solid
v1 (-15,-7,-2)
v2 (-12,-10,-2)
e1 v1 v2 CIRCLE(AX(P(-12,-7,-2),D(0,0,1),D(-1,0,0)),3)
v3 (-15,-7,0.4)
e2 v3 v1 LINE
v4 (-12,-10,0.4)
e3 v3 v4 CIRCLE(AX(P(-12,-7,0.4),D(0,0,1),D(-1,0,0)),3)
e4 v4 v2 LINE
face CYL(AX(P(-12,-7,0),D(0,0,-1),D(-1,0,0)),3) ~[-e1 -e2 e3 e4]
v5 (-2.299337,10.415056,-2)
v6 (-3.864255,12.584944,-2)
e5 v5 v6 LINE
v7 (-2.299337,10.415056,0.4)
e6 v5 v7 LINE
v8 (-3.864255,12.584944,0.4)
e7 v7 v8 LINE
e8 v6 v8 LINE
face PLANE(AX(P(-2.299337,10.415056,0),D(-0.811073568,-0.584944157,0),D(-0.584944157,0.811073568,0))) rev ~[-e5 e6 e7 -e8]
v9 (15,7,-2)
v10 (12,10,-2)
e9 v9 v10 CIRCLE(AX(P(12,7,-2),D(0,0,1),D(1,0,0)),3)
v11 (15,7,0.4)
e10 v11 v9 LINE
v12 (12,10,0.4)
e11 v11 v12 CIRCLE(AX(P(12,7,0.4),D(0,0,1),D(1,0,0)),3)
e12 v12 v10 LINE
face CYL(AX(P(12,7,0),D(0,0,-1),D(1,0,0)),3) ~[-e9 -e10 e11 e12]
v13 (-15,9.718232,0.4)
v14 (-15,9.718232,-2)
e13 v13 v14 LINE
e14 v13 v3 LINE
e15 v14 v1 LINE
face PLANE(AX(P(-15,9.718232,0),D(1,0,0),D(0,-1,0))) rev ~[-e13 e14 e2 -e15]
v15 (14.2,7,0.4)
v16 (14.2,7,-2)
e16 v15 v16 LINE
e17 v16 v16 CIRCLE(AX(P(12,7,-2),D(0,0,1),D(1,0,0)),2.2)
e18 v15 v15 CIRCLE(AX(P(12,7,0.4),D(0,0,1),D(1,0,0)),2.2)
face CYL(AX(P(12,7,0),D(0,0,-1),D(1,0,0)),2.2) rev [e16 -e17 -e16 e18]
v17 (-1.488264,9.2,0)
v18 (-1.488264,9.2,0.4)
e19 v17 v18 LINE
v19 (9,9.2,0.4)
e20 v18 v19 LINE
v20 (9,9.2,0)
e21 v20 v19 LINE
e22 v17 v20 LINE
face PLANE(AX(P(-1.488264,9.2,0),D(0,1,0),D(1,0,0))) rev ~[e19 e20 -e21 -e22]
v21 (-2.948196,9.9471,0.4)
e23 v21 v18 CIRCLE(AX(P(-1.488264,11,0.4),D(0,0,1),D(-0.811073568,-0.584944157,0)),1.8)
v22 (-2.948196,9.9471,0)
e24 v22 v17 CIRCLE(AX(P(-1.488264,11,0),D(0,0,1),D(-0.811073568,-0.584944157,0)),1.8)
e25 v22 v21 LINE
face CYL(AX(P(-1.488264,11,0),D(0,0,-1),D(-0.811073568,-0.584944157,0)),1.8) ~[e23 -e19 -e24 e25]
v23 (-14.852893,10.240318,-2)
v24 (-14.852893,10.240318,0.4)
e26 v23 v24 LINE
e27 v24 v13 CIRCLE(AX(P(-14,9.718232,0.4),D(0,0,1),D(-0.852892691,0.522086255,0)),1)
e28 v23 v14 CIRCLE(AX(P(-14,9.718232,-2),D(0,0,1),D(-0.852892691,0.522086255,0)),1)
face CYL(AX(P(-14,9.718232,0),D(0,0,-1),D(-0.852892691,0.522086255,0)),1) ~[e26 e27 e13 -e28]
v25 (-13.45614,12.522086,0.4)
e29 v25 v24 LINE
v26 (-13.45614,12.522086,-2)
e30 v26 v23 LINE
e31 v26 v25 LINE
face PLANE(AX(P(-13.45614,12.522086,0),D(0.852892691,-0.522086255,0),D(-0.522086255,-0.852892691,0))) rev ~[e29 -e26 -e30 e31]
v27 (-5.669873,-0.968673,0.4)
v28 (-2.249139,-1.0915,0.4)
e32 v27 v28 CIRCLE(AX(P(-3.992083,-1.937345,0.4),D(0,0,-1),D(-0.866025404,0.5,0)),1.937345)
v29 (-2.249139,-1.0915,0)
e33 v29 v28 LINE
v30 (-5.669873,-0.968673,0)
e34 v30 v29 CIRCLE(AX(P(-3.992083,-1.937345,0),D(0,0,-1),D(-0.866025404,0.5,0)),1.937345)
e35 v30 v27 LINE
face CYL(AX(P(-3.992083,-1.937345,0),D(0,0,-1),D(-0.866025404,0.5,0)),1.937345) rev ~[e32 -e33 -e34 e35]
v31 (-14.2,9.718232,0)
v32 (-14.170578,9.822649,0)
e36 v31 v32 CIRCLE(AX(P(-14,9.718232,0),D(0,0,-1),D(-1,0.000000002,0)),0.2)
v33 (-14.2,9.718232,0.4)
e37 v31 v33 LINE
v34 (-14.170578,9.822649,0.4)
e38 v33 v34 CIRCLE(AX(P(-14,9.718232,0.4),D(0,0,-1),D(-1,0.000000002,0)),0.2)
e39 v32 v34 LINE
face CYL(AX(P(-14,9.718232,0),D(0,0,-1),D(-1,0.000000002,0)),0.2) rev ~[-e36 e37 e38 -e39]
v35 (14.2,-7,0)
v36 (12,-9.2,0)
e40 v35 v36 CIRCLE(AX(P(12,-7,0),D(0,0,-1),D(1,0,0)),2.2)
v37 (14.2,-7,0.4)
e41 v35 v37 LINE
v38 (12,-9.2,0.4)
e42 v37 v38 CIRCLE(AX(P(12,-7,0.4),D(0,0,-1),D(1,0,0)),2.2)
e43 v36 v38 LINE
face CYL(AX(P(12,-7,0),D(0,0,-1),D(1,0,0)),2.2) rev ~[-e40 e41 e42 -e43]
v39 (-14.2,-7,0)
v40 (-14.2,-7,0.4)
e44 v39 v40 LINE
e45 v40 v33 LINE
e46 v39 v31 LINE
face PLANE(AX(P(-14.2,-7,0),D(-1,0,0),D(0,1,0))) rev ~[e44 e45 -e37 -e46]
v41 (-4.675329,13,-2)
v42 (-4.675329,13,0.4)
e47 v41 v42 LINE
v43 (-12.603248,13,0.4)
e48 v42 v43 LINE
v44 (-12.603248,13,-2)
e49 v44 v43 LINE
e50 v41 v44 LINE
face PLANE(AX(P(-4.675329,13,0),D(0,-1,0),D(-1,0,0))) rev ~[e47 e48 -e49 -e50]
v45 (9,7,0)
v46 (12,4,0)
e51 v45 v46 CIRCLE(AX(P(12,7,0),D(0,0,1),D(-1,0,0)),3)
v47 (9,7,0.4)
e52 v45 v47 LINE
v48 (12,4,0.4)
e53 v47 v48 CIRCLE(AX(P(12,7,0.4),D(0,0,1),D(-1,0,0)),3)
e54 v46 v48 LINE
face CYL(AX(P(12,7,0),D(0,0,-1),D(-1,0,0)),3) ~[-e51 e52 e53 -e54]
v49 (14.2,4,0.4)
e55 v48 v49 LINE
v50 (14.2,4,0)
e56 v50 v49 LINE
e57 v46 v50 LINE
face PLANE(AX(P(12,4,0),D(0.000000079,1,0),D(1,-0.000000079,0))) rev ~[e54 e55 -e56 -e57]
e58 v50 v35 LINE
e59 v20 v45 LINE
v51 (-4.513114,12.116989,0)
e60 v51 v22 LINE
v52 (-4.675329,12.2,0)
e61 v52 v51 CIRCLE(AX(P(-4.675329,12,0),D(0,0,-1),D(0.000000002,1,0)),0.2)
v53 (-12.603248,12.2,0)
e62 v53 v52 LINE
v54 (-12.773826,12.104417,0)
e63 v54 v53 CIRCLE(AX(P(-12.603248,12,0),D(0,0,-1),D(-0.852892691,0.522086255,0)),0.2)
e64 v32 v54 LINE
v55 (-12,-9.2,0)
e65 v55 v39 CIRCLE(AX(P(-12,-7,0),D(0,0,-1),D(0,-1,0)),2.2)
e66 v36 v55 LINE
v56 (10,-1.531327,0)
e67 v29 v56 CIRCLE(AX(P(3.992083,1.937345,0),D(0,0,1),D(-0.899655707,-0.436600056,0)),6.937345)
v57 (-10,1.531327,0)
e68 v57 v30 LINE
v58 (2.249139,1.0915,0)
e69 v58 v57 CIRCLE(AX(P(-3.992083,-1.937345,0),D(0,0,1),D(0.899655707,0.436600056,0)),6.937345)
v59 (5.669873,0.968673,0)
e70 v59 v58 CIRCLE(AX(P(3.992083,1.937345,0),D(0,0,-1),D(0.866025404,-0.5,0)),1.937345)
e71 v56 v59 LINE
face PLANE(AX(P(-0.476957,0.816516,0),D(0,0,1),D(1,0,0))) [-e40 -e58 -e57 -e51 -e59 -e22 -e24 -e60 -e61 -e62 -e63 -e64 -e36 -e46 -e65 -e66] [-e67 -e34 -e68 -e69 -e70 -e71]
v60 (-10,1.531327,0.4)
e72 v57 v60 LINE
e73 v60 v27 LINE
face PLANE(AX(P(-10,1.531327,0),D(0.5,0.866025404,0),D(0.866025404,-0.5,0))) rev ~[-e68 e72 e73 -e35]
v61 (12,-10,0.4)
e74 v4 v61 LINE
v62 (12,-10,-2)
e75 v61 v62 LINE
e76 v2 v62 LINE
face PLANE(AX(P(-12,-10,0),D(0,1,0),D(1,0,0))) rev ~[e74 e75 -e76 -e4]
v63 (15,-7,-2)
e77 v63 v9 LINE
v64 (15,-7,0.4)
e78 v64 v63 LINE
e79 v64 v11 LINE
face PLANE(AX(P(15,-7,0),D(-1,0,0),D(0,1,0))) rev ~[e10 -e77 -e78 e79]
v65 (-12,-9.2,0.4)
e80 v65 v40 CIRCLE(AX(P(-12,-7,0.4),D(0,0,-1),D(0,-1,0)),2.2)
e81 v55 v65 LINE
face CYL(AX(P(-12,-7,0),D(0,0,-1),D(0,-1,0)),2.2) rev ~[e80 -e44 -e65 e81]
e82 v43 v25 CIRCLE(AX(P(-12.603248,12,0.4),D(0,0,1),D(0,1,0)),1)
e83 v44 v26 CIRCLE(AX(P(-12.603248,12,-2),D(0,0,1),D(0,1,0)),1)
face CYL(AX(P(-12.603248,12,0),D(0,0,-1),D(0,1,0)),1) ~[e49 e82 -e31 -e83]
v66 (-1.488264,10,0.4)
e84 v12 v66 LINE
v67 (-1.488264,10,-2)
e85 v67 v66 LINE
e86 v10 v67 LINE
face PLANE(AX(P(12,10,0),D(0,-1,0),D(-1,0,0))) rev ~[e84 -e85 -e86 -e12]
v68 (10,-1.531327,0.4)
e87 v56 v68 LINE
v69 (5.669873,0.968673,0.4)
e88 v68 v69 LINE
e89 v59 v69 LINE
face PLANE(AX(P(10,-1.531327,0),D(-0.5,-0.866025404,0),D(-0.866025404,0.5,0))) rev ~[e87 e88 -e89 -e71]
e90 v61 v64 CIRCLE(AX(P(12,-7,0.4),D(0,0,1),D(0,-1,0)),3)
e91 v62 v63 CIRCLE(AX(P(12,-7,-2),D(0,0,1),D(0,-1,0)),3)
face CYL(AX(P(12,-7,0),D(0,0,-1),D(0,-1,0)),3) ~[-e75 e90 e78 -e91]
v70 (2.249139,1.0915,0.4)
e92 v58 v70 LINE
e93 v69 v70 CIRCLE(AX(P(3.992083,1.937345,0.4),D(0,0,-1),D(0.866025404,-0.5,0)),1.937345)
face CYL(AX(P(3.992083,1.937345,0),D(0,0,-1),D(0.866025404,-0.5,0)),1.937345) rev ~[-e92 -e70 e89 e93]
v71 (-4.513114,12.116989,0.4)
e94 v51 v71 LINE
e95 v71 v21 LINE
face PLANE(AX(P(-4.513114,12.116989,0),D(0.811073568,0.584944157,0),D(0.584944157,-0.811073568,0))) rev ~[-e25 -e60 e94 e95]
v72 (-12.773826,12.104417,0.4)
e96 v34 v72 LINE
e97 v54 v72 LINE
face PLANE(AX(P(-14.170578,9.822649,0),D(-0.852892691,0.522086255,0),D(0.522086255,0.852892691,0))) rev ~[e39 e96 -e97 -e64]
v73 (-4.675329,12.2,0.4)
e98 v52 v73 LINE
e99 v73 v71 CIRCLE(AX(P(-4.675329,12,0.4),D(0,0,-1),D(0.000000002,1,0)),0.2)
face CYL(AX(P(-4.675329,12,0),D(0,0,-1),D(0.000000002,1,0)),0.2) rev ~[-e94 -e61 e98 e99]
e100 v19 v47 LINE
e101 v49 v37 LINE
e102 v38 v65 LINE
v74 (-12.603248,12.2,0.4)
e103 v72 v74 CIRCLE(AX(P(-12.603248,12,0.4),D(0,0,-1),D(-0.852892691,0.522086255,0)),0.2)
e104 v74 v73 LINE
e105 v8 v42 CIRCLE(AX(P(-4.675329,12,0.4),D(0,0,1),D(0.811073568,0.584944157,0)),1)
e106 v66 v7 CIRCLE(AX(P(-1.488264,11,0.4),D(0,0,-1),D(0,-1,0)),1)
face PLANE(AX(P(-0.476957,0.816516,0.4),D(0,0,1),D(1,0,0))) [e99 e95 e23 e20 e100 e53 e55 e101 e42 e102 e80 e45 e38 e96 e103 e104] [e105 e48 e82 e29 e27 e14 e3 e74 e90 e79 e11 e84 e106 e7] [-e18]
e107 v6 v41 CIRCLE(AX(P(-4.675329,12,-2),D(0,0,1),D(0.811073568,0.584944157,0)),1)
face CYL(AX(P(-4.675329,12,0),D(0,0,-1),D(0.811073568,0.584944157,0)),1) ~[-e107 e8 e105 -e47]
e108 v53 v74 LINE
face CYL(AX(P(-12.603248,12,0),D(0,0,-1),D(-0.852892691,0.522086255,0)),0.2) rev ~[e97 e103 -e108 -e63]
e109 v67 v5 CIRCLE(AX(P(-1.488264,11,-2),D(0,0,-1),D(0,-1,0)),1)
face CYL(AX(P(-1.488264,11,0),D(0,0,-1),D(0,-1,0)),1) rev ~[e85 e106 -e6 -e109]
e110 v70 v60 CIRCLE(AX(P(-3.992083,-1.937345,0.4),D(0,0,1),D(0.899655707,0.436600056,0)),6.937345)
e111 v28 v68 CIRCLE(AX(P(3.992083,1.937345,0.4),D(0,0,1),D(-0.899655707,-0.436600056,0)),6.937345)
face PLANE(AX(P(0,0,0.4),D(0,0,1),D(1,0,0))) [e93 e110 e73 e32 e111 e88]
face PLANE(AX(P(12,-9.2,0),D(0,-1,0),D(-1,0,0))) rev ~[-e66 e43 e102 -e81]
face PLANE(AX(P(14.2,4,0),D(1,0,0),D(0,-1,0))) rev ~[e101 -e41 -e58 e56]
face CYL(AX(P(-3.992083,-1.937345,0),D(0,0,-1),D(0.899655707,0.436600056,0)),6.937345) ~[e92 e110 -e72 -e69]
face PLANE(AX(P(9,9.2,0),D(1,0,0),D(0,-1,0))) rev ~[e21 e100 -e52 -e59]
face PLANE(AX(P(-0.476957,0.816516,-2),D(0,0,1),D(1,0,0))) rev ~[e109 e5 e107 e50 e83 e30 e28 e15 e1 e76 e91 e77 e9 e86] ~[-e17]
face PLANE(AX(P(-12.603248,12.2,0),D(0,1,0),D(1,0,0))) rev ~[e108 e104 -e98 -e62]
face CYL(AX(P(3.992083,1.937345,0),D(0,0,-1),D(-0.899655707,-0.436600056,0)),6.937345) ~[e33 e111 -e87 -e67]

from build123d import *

# Parameters (mm, degrees)
F0_R     = 2.1999998258
F1_DEPTH = 2
F2_DEPTH = 0.4


# Not quite as in the source:
# - ends of sketch curves that miss each other by under 0.0002 mm in the source are joined


with BuildPart() as f1:
    # F0 (on Top) → F1 (new body)
    with BuildSketch(Plane.XY):
        with BuildLine():
            Line((12, 10), (-1.4882636307, 10))
            ThreePointArc((-1.4882636307, 10), (-1.9438159565, 10.1097909917), (-2.2993371991, 10.4150558431))
            Line((-2.2993371991, 10.4150558431), (-3.8642550313, 12.5849441569))
            ThreePointArc((-3.8642550313, 12.5849441569), (-4.2197762739, 12.8902090083), (-4.6753285997, 13))
            Line((-4.6753285997, 13), (-12.6032477109, 13))
            ThreePointArc((-12.6032477109, 13), (-13.0920798627, 12.8723778582), (-13.456140402, 12.5220862548))
            Line((-13.456140402, 12.5220862548), (-14.8528926911, 10.2403180459))
            ThreePointArc((-14.8528926911, 10.2403180459), (-14.9625208286, 9.989439561), (-15, 9.7182317911))
            Line((-15, 9.7182317911), (-15, -7))
            ThreePointArc((-15, -7), (-14.1213203436, -9.1213203436), (-12, -10))
            Line((-12, -10), (12, -10))
            ThreePointArc((12, -10), (14.1213203436, -9.1213203436), (15, -7))
            Line((15, -7), (15, 7))
            ThreePointArc((15, 7), (14.1213203436, 9.1213203436), (12, 10))
        make_face()
        with BuildLine():
            ThreePointArc((-14.1999998258, 9.7182317911), (-14.192503998, 9.7724732978), (-14.1705783896, 9.8226489511))
            Line((-14.1705783896, 9.8226489511), (-12.7738261005, 12.10441716))
            ThreePointArc((-12.7738261005, 12.10441716), (-12.7010140561, 12.1744754196), (-12.6032477109, 12.1999998258))
            Line((-12.6032477109, 12.1999998258), (-4.6753285997, 12.1999998258))
            ThreePointArc((-4.6753285997, 12.1999998258), (-4.5842182139, 12.1780416465), (-4.5131140273, 12.1169887295))
            Line((-4.5131140273, 12.1169887295), (-2.9481961951, 9.9471004156))
            ThreePointArc((-2.9481961951, 9.9471004156), (-2.3082578965, 9.3976236299), (-1.4882636307, 9.1999998258))
            Line((-1.4882636307, 9.1999998258), (9.0000001742, 9.1999998258))
            Line((9.0000001742, 9.1999998258), (9.0000001742, 7))
            ThreePointArc((9.0000001742, 7), (9.8786797797, 4.8786797797), (12, 4.0000001742))
            Line((12, 4.0000001742), (14.1999998258, 4))
            Line((14.1999998258, 4), (14.1999998258, -7))
            ThreePointArc((14.1999998258, -7), (13.5556347954, -8.5556347954), (12, -9.1999998258))
            Line((12, -9.1999998258), (-12, -9.1999998258))
            ThreePointArc((-12, -9.1999998258), (-13.5556347954, -8.5556347954), (-14.1999998258, -7))
            Line((-14.1999998258, -7), (-14.1999998258, 9.7182317911))
        make_face(mode=Mode.SUBTRACT)
        with Locations((12, 7)):
            Circle(F0_R, mode=Mode.SUBTRACT)
        with BuildLine():
            Line((-12.7738261005, 12.10441716), (-14.1705783896, 9.8226489511))
            ThreePointArc((-14.1705783896, 9.8226489511), (-14.192503998, 9.7724732978), (-14.1999998258, 9.7182317911))
            Line((-14.1999998258, 9.7182317911), (-14.1999998258, -7))
            ThreePointArc((-14.1999998258, -7), (-13.5556347954, -8.5556347954), (-12, -9.1999998258))
            Line((-12, -9.1999998258), (12, -9.1999998258))
            ThreePointArc((12, -9.1999998258), (13.5556347954, -8.5556347954), (14.1999998258, -7))
            Line((14.1999998258, -7), (14.1999998258, 4))
            Line((14.1999998258, 4), (12, 4))
            ThreePointArc((12, 4), (9.8786797797, 4.8786797797), (9.0000001742, 7))
            Line((9.0000001742, 7), (9.0000001742, 9.1999998258))
            Line((9.0000001742, 9.1999998258), (-1.4882636307, 9.1999998258))
            ThreePointArc((-1.4882636307, 9.1999998258), (-2.3082578965, 9.3976236299), (-2.9481961951, 9.9471004156))
            Line((-2.9481961951, 9.9471004156), (-4.5131140273, 12.1169887295))
            ThreePointArc((-4.5131140273, 12.1169887295), (-4.5842182139, 12.1780416465), (-4.6753285997, 12.1999998258))
            Line((-4.6753285997, 12.1999998258), (-12.6032477109, 12.1999998258))
            ThreePointArc((-12.6032477109, 12.1999998258), (-12.7010140561, 12.1744754196), (-12.7738261005, 12.10441716))
        make_face()
        with BuildLine():
            ThreePointArc((10, -1.5313274312), (3.7431454959, -4.9955321683), (-2.2491392669, -1.0915001412))
            ThreePointArc((-2.2491392669, -1.0915001412), (-3.9225638289, -0.0012477009), (-5.6698729811, -0.9686725688))
            Line((-5.6698729811, -0.9686725688), (-10, 1.5313274312))
            ThreePointArc((-10, 1.5313274312), (-3.7431454959, 4.9955321683), (2.2491392669, 1.0915001412))
            ThreePointArc((2.2491392669, 1.0915001412), (3.9225638289, 0.0012477009), (5.6698729811, 0.9686725688))
            Line((5.6698729811, 0.9686725688), (10, -1.5313274312))
        make_face(mode=Mode.SUBTRACT)
        with BuildLine():
            ThreePointArc((-5.6698729811, -0.9686725688), (-3.9225638289, -0.0012477009), (-2.2491392669, -1.0915001412))
            ThreePointArc((-2.2491392669, -1.0915001412), (3.7431454959, -4.9955321683), (10, -1.5313274312))
            Line((10, -1.5313274312), (5.6698729811, 0.9686725688))
            ThreePointArc((5.6698729811, 0.9686725688), (3.9225638289, 0.0012477009), (2.2491392669, 1.0915001412))
            ThreePointArc((2.2491392669, 1.0915001412), (-3.7431454959, 4.9955321683), (-10, 1.5313274312))
            Line((-10, 1.5313274312), (-5.6698729811, -0.9686725688))
        make_face()
    extrude(amount=-F1_DEPTH)

    # F0 (on Top) → F2 (join)
    with BuildSketch(Plane.XY):
        with BuildLine():
            Line((12, 10), (-1.4882636307, 10))
            ThreePointArc((-1.4882636307, 10), (-1.9438159565, 10.1097909917), (-2.2993371991, 10.4150558431))
            Line((-2.2993371991, 10.4150558431), (-3.8642550313, 12.5849441569))
            ThreePointArc((-3.8642550313, 12.5849441569), (-4.2197762739, 12.8902090083), (-4.6753285997, 13))
            Line((-4.6753285997, 13), (-12.6032477109, 13))
            ThreePointArc((-12.6032477109, 13), (-13.0920798627, 12.8723778582), (-13.456140402, 12.5220862548))
            Line((-13.456140402, 12.5220862548), (-14.8528926911, 10.2403180459))
            ThreePointArc((-14.8528926911, 10.2403180459), (-14.9625208286, 9.989439561), (-15, 9.7182317911))
            Line((-15, 9.7182317911), (-15, -7))
            ThreePointArc((-15, -7), (-14.1213203436, -9.1213203436), (-12, -10))
            Line((-12, -10), (12, -10))
            ThreePointArc((12, -10), (14.1213203436, -9.1213203436), (15, -7))
            Line((15, -7), (15, 7))
            ThreePointArc((15, 7), (14.1213203436, 9.1213203436), (12, 10))
        make_face()
        with BuildLine():
            ThreePointArc((-14.1999998258, 9.7182317911), (-14.192503998, 9.7724732978), (-14.1705783896, 9.8226489511))
            Line((-14.1705783896, 9.8226489511), (-12.7738261005, 12.10441716))
            ThreePointArc((-12.7738261005, 12.10441716), (-12.7010140561, 12.1744754196), (-12.6032477109, 12.1999998258))
            Line((-12.6032477109, 12.1999998258), (-4.6753285997, 12.1999998258))
            ThreePointArc((-4.6753285997, 12.1999998258), (-4.5842182139, 12.1780416465), (-4.5131140273, 12.1169887295))
            Line((-4.5131140273, 12.1169887295), (-2.9481961951, 9.9471004156))
            ThreePointArc((-2.9481961951, 9.9471004156), (-2.3082578965, 9.3976236299), (-1.4882636307, 9.1999998258))
            Line((-1.4882636307, 9.1999998258), (9.0000001742, 9.1999998258))
            Line((9.0000001742, 9.1999998258), (9.0000001742, 7))
            ThreePointArc((9.0000001742, 7), (9.8786797797, 4.8786797797), (12, 4.0000001742))
            Line((12, 4.0000001742), (14.1999998258, 4))
            Line((14.1999998258, 4), (14.1999998258, -7))
            ThreePointArc((14.1999998258, -7), (13.5556347954, -8.5556347954), (12, -9.1999998258))
            Line((12, -9.1999998258), (-12, -9.1999998258))
            ThreePointArc((-12, -9.1999998258), (-13.5556347954, -8.5556347954), (-14.1999998258, -7))
            Line((-14.1999998258, -7), (-14.1999998258, 9.7182317911))
        make_face(mode=Mode.SUBTRACT)
        with Locations((12, 7)):
            Circle(F0_R, mode=Mode.SUBTRACT)
        with BuildLine():
            ThreePointArc((-5.6698729811, -0.9686725688), (-3.9225638289, -0.0012477009), (-2.2491392669, -1.0915001412))
            ThreePointArc((-2.2491392669, -1.0915001412), (3.7431454959, -4.9955321683), (10, -1.5313274312))
            Line((10, -1.5313274312), (5.6698729811, 0.9686725688))
            ThreePointArc((5.6698729811, 0.9686725688), (3.9225638289, 0.0012477009), (2.2491392669, 1.0915001412))
            ThreePointArc((2.2491392669, 1.0915001412), (-3.7431454959, 4.9955321683), (-10, 1.5313274312))
            Line((-10, 1.5313274312), (-5.6698729811, -0.9686725688))
        make_face()
    extrude(amount=F2_DEPTH)


solid = f1.part
